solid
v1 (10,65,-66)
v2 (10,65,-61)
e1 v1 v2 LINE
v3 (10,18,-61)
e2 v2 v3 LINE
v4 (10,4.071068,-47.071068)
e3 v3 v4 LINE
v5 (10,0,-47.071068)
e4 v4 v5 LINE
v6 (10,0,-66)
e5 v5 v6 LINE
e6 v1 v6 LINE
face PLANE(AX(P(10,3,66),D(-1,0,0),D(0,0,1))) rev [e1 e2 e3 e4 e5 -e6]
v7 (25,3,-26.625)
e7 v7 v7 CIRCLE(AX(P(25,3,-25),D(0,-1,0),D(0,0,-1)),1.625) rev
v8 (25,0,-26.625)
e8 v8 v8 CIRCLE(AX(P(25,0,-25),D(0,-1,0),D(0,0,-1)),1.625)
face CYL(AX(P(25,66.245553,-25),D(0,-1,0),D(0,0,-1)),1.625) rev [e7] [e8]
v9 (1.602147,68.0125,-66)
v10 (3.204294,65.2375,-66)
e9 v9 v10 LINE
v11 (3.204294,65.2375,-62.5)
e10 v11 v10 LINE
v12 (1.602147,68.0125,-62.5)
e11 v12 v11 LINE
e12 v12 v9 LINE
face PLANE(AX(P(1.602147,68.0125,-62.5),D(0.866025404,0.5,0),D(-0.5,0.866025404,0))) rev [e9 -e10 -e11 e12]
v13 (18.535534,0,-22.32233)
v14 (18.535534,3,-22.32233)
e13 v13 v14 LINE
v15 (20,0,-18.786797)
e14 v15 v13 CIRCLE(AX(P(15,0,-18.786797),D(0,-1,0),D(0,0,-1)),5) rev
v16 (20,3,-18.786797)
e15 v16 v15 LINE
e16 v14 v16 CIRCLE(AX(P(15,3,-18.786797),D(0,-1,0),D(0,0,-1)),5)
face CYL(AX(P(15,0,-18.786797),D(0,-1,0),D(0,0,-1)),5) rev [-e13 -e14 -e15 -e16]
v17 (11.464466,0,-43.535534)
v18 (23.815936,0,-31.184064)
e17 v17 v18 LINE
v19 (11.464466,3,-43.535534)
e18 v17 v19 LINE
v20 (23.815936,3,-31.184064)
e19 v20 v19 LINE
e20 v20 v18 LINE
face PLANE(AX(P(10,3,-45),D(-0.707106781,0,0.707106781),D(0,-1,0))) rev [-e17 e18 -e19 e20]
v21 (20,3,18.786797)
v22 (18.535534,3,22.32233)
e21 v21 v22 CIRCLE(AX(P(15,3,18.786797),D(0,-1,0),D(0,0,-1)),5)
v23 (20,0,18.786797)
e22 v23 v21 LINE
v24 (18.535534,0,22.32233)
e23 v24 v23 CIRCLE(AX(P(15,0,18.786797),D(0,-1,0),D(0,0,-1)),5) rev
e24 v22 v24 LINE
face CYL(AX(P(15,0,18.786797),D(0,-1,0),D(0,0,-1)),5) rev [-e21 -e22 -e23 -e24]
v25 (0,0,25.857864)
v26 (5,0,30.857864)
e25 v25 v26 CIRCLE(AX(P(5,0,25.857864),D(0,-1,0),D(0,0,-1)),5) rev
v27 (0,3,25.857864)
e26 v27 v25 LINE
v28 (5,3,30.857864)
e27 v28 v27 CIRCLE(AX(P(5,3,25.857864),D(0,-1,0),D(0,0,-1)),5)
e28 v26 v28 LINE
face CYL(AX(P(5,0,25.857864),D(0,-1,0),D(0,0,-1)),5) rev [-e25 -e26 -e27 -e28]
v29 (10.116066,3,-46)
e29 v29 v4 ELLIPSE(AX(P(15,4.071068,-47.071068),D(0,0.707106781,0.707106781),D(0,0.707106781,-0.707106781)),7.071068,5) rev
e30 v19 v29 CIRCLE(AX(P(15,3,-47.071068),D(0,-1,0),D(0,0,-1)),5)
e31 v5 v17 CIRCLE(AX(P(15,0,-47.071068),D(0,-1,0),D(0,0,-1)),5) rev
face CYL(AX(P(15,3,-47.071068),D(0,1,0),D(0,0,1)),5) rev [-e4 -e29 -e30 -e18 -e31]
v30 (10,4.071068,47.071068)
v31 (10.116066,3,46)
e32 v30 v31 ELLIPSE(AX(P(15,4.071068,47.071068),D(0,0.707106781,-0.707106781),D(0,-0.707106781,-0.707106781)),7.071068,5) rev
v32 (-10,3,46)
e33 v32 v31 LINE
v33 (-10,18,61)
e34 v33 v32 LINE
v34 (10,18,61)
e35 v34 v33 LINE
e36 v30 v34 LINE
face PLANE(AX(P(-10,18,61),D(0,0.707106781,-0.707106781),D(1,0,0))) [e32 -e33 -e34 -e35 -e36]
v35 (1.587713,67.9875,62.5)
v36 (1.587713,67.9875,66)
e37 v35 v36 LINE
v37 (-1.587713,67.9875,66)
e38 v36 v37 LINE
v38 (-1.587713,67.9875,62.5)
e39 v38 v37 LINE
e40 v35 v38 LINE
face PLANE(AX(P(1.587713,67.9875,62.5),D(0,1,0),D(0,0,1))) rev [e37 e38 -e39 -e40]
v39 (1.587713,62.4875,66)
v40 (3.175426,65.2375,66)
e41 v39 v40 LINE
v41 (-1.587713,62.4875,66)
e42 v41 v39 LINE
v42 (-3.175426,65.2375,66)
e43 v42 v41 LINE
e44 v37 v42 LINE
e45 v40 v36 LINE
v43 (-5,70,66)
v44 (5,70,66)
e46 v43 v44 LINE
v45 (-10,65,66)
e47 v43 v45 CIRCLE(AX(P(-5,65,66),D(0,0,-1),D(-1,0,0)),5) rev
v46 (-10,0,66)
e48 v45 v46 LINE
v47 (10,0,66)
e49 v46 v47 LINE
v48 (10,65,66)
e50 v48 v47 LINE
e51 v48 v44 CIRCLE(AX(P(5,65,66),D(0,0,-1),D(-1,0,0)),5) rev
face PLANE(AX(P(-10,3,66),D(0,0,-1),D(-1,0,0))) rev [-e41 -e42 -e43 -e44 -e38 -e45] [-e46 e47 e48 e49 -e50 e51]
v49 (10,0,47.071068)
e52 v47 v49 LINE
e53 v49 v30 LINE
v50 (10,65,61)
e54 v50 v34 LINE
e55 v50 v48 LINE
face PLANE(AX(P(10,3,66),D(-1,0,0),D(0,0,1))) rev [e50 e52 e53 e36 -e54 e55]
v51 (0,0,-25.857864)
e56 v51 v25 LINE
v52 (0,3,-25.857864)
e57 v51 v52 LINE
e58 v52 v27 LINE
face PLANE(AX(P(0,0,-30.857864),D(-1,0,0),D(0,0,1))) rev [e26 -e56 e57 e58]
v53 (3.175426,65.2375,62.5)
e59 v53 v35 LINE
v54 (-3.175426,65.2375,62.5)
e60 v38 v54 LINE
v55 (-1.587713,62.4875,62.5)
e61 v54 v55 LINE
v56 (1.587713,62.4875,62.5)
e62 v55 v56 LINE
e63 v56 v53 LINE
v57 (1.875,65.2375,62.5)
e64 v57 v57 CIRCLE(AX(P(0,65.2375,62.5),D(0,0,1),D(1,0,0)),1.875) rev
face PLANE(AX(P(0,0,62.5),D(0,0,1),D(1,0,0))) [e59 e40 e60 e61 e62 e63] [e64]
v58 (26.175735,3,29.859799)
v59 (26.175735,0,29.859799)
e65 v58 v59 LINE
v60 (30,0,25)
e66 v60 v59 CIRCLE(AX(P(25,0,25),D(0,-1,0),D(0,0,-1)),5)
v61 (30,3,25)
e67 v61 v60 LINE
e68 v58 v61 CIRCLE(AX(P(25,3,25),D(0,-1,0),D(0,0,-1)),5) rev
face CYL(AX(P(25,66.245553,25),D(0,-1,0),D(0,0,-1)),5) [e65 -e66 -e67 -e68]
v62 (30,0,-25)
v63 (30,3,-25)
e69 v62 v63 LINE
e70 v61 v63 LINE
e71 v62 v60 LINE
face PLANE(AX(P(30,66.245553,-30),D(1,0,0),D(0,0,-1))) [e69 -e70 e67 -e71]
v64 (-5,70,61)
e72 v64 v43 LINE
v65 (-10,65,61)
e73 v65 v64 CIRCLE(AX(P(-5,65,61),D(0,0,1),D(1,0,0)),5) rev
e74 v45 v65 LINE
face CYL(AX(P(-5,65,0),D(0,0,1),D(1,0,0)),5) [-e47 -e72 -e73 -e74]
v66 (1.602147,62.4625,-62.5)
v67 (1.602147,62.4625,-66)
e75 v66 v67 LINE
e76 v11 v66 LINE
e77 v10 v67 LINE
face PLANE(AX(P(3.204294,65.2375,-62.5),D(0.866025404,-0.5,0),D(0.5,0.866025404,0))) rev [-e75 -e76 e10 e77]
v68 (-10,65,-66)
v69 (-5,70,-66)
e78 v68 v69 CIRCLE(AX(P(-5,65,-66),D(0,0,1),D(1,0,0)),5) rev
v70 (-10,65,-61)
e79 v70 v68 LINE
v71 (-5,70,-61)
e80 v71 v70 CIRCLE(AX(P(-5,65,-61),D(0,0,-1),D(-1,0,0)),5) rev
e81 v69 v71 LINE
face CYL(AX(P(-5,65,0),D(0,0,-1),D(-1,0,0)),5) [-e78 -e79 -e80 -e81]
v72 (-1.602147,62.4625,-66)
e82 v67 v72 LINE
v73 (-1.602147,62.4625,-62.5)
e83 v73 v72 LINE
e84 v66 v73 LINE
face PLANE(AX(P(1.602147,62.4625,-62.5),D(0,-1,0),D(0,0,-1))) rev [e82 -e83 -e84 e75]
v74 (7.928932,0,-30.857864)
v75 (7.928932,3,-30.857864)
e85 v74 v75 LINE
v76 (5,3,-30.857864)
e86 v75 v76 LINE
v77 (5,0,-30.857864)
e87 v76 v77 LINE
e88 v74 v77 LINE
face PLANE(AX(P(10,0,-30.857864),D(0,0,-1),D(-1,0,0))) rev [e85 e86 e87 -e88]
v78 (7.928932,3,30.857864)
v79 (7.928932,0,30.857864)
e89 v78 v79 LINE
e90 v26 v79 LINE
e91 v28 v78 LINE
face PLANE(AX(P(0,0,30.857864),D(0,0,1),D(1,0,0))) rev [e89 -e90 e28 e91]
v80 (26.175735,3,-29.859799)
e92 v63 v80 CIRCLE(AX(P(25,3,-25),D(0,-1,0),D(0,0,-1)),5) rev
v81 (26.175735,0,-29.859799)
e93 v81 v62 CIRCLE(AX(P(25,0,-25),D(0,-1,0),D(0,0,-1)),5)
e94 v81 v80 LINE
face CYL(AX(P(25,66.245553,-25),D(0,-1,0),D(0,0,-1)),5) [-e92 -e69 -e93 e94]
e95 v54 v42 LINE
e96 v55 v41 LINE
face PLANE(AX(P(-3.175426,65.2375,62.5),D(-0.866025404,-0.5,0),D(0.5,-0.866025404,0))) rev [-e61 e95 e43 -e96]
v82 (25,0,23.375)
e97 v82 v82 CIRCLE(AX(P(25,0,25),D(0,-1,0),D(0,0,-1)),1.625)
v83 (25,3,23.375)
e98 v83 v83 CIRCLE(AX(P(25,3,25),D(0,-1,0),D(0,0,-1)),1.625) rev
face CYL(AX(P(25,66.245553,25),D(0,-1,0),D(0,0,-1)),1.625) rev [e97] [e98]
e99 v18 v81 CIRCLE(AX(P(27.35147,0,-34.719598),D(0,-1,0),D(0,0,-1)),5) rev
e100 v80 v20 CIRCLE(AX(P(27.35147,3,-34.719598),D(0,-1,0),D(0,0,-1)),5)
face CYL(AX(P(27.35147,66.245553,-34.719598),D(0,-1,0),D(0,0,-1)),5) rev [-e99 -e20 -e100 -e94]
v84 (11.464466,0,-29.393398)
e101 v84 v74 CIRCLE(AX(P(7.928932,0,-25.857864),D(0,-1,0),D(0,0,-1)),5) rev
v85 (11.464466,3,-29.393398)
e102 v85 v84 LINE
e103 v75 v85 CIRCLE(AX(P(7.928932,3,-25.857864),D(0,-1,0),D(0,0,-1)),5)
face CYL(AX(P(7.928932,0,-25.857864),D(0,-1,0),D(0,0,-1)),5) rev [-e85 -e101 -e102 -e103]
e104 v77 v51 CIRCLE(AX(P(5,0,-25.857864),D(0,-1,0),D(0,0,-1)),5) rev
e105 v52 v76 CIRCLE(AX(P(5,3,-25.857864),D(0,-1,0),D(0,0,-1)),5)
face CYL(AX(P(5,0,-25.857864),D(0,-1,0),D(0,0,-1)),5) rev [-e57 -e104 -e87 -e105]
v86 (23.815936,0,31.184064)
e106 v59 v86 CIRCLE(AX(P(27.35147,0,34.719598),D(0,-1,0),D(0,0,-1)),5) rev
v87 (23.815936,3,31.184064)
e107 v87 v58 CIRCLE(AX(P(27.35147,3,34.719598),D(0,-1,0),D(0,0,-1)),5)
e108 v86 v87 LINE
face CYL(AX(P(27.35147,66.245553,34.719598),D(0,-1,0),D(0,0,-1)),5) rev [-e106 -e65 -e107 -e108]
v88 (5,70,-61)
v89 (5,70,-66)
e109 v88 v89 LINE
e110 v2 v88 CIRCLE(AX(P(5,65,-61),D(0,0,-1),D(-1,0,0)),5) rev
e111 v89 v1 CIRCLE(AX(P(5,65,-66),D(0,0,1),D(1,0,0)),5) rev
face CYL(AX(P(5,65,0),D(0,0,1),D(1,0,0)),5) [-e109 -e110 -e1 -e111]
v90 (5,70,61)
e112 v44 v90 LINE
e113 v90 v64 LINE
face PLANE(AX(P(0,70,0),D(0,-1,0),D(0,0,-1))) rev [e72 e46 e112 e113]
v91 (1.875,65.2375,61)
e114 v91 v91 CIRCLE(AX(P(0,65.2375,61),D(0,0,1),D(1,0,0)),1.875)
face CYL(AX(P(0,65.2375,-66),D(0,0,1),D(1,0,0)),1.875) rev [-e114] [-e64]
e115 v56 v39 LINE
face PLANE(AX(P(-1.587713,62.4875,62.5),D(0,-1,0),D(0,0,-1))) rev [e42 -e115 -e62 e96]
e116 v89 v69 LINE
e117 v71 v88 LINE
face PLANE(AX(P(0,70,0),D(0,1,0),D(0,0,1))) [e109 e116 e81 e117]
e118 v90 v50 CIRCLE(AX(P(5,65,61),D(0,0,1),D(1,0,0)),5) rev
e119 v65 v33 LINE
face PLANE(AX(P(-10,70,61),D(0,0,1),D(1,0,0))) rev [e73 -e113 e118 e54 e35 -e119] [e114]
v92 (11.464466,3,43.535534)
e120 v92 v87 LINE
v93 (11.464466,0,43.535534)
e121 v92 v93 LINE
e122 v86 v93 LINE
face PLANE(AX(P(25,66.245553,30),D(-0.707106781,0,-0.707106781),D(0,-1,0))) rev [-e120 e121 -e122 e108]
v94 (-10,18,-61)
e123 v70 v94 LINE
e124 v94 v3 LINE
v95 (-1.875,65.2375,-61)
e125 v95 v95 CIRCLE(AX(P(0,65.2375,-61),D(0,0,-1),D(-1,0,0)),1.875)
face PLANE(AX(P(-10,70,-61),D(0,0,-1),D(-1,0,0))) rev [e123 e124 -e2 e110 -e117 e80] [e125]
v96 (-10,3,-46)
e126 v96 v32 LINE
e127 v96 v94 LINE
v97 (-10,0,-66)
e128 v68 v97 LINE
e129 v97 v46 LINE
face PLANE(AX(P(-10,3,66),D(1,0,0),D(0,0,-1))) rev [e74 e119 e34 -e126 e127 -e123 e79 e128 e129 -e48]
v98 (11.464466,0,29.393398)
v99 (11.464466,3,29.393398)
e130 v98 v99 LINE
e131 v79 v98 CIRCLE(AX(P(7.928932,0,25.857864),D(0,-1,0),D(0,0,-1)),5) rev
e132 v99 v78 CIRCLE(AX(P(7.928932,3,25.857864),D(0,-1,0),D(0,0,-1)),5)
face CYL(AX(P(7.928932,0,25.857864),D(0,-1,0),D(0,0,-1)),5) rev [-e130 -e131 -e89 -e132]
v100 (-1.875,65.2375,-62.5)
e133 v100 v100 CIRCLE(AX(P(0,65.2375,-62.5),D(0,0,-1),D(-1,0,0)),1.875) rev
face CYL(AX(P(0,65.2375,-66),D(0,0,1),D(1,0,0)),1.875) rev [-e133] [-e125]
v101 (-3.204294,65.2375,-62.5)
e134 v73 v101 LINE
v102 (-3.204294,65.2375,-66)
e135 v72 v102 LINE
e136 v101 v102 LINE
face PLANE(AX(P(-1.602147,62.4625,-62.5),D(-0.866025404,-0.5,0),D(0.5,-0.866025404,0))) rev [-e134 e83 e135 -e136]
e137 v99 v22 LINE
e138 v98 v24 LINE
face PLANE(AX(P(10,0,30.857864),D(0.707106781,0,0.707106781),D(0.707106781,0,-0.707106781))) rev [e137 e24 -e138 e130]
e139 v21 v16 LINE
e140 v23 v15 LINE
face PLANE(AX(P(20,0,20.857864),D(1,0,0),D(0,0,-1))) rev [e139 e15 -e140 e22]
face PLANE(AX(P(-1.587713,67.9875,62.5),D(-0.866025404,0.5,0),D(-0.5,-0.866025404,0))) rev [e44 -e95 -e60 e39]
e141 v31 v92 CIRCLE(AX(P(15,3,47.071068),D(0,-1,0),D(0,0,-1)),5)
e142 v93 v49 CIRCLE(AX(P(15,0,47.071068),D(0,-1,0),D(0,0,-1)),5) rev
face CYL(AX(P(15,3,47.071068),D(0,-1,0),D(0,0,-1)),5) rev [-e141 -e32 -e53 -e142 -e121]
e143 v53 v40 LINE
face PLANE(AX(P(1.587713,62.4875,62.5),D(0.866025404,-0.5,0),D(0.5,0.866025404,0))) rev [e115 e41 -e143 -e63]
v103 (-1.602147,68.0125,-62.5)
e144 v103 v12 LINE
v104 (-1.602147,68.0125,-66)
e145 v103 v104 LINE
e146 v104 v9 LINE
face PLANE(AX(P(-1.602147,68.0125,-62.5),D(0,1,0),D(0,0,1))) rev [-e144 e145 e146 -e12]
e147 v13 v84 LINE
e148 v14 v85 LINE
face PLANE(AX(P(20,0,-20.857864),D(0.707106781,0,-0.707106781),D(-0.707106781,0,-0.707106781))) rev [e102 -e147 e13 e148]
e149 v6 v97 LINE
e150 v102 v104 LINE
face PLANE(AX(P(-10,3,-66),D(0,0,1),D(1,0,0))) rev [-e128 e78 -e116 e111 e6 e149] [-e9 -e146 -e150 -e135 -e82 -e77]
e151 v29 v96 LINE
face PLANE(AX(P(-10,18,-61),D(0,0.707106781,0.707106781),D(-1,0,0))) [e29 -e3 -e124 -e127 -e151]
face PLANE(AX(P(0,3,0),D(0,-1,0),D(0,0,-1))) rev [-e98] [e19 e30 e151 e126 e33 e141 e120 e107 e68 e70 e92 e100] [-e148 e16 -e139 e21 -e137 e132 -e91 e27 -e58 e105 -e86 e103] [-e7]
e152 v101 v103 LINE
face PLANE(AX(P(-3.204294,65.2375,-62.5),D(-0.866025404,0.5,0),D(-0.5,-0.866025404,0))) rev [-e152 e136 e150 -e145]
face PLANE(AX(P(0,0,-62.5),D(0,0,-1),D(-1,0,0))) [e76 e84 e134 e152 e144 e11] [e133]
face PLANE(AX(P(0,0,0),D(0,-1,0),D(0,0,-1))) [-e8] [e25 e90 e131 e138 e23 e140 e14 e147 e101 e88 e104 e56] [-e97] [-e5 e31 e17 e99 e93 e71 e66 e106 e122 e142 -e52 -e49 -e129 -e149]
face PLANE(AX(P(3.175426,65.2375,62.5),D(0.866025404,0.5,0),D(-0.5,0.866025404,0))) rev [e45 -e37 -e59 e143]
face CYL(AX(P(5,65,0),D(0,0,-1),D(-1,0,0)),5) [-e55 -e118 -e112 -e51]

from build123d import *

# Parameters (mm, degrees)
SKETCH1_W           = 20
SKETCH1_H           = 132
BOSS_EXTRUDE1_DEPTH = 3
SKETCH2_W           = 20
SKETCH2_H           = 4.999999999999993
BOSS_EXTRUDE2_DEPTH = 67
SKETCH4_R           = 1.875000000000003
CUT_EXTRUDE1_DEPTH  = 150.74645237867907
FILLET3_R           = 5
CUT_EXTRUDE2_DEPTH  = 3.5
CUT_EXTRUDE3_DEPTH  = 3.5
SKETCH9_R           = 1.625000000000004
BOSS_EXTRUDE3_DEPTH = 3
CHAMFER1_SIZE       = 15
FILLET4_R           = 5
CUT_EXTRUDE4_DEPTH  = 99.71676655968832
FILLET5_R           = 5


with BuildPart() as part:
    # Sketch1 → Boss-Extrude1 (new body)
    with BuildSketch(Plane(origin=(0, 0, 0), x_dir=(1, 0, 0), z_dir=(0, 1, 0))):
        Rectangle(SKETCH1_W, SKETCH1_H)
    extrude(amount=BOSS_EXTRUDE1_DEPTH)

    # Sketch2 → Boss-Extrude2 (add)
    with BuildSketch(Plane(origin=(0, 3, 0), x_dir=(1, 0, 0), z_dir=(0, 1, 0))):
        Polygon((-10, -66), (10, -66), (9.999999999999998, -61.00000000000001), (-10, -61.00000000000001), align=None)
        with Locations((0, 63.5)):
            Rectangle(SKETCH2_W, SKETCH2_H)
    extrude(amount=BOSS_EXTRUDE2_DEPTH)

    # Sketch4 → Cut-Extrude1 (cut, through all)
    with BuildSketch(Plane.XY.offset(66)):
        with Locations((0, 65.2375)):
            Circle(SKETCH4_R)
    extrude(amount=-CUT_EXTRUDE1_DEPTH, mode=Mode.SUBTRACT)

    # Fillet3
    fillet3_edges = [part.edges().sort_by_distance(p)[0] for p in [
        (-10, 70, 63.5),
        (10, 70, 63.5),
        (-10, 70, -63.5),
        (10, 70, -63.5),
    ]]
    fillet(fillet3_edges, radius=FILLET3_R)

    # Sketch6 → Cut-Extrude2 (cut)
    with BuildSketch(Plane.XY.offset(66)):
        Polygon((3.175426480542929, 65.2375), (1.5877132402714664, 67.9875), (-1.5877132402714669, 67.9875), (-3.1754264805429386, 65.23749999999998), (-1.5877132402714738, 62.487500000000004), (1.587713240271455, 62.487500000000004), align=None)
    extrude(amount=-CUT_EXTRUDE2_DEPTH, mode=Mode.SUBTRACT)

    # Sketch7 → Cut-Extrude3 (cut)
    with BuildSketch(Plane(origin=(0, 0, -66), x_dir=(-1, 0, 0), z_dir=(0, 0, -1))):
        Polygon((3.2042939940024326, 65.2375), (1.6021469970012208, 68.0125), (-1.6021469970012086, 68.0125), (-3.204293994002428, 65.23749999999998), (-1.6021469970012214, 62.4625), (1.602146997001218, 62.4625), align=None)
    extrude(amount=-CUT_EXTRUDE3_DEPTH, mode=Mode.SUBTRACT)

    # Sketch9 → Boss-Extrude3 (add)
    with BuildSketch(Plane.XZ):
        Polygon((30.000000000000007, -29.999999999999996), (10, -30), (10, 30.000000000000004), (30.000000000000007, 30.000000000000004), align=None)
        with Locations(Location((25, -25, 0), (0, 0, 270))):
            Circle(SKETCH9_R, mode=Mode.SUBTRACT)
        with Locations(Location((25, 25, 0), (0, 0, 270))):
            Circle(SKETCH9_R, mode=Mode.SUBTRACT)
    extrude(amount=-BOSS_EXTRUDE3_DEPTH)

    # Chamfer1
    chamfer1_edges = [part.edges().sort_by_distance(p)[0] for p in [
        (10, 1.5, 30.000000000000004),
        (10, 1.5, -30),
        (-1.78e-15, 3, 61.00000000000001),
        (0, 3, -61.00000000000001),
    ]]
    chamfer(chamfer1_edges, length=CHAMFER1_SIZE)

    # Fillet4
    fillet4_edges = [part.edges().sort_by_distance(p)[0] for p in [
        (30.000000000000007, 1.5, 30.000000000000004),
        (30.000000000000007, 1.5, -29.999999999999996),
    ]]
    fillet(fillet4_edges, radius=FILLET4_R - 0.0001)  # a hair under: the kernel refuses the full size

    # Sketch10 → Cut-Extrude4 (cut, through all)
    with BuildSketch(Plane(origin=(0, 3, 0), x_dir=(1, 0, 0), z_dir=(0, 1, 0))):
        Polygon((-7.92e-15, 30.857864376268985), (1.097e-14, -30.857864376268985), (10.00000000000001, -30.857864376268985), (20.000000000000004, -20.85786437626899), (20.000000000000004, 20.857864376268978), (9.999999999999991, 30.857864376268992), align=None)
    extrude(amount=-CUT_EXTRUDE4_DEPTH, mode=Mode.SUBTRACT)

    # Fillet5
    fillet5_edges = [part.edges().sort_by_distance(p)[0] for p in [
        (25, 1.5, 30),
        (10, 1.5, 45),
        (10, 1.5, -45),
        (25, 1.5, -29.999999999999996),
        (10.00000000000001, 1.5, 30.857864376268985),
        (1.097e-14, 1.5, 30.857864376268985),
        (-7.92e-15, 1.5, -30.857864376268985),
        (9.999999999999991, 1.5, -30.857864376268992),
        (20.000000000000004, 1.5, -20.857864376268978),
        (20.000000000000004, 1.5, 20.85786437626899),
    ]]
    fillet(fillet5_edges, radius=FILLET5_R)


solid = part.part
